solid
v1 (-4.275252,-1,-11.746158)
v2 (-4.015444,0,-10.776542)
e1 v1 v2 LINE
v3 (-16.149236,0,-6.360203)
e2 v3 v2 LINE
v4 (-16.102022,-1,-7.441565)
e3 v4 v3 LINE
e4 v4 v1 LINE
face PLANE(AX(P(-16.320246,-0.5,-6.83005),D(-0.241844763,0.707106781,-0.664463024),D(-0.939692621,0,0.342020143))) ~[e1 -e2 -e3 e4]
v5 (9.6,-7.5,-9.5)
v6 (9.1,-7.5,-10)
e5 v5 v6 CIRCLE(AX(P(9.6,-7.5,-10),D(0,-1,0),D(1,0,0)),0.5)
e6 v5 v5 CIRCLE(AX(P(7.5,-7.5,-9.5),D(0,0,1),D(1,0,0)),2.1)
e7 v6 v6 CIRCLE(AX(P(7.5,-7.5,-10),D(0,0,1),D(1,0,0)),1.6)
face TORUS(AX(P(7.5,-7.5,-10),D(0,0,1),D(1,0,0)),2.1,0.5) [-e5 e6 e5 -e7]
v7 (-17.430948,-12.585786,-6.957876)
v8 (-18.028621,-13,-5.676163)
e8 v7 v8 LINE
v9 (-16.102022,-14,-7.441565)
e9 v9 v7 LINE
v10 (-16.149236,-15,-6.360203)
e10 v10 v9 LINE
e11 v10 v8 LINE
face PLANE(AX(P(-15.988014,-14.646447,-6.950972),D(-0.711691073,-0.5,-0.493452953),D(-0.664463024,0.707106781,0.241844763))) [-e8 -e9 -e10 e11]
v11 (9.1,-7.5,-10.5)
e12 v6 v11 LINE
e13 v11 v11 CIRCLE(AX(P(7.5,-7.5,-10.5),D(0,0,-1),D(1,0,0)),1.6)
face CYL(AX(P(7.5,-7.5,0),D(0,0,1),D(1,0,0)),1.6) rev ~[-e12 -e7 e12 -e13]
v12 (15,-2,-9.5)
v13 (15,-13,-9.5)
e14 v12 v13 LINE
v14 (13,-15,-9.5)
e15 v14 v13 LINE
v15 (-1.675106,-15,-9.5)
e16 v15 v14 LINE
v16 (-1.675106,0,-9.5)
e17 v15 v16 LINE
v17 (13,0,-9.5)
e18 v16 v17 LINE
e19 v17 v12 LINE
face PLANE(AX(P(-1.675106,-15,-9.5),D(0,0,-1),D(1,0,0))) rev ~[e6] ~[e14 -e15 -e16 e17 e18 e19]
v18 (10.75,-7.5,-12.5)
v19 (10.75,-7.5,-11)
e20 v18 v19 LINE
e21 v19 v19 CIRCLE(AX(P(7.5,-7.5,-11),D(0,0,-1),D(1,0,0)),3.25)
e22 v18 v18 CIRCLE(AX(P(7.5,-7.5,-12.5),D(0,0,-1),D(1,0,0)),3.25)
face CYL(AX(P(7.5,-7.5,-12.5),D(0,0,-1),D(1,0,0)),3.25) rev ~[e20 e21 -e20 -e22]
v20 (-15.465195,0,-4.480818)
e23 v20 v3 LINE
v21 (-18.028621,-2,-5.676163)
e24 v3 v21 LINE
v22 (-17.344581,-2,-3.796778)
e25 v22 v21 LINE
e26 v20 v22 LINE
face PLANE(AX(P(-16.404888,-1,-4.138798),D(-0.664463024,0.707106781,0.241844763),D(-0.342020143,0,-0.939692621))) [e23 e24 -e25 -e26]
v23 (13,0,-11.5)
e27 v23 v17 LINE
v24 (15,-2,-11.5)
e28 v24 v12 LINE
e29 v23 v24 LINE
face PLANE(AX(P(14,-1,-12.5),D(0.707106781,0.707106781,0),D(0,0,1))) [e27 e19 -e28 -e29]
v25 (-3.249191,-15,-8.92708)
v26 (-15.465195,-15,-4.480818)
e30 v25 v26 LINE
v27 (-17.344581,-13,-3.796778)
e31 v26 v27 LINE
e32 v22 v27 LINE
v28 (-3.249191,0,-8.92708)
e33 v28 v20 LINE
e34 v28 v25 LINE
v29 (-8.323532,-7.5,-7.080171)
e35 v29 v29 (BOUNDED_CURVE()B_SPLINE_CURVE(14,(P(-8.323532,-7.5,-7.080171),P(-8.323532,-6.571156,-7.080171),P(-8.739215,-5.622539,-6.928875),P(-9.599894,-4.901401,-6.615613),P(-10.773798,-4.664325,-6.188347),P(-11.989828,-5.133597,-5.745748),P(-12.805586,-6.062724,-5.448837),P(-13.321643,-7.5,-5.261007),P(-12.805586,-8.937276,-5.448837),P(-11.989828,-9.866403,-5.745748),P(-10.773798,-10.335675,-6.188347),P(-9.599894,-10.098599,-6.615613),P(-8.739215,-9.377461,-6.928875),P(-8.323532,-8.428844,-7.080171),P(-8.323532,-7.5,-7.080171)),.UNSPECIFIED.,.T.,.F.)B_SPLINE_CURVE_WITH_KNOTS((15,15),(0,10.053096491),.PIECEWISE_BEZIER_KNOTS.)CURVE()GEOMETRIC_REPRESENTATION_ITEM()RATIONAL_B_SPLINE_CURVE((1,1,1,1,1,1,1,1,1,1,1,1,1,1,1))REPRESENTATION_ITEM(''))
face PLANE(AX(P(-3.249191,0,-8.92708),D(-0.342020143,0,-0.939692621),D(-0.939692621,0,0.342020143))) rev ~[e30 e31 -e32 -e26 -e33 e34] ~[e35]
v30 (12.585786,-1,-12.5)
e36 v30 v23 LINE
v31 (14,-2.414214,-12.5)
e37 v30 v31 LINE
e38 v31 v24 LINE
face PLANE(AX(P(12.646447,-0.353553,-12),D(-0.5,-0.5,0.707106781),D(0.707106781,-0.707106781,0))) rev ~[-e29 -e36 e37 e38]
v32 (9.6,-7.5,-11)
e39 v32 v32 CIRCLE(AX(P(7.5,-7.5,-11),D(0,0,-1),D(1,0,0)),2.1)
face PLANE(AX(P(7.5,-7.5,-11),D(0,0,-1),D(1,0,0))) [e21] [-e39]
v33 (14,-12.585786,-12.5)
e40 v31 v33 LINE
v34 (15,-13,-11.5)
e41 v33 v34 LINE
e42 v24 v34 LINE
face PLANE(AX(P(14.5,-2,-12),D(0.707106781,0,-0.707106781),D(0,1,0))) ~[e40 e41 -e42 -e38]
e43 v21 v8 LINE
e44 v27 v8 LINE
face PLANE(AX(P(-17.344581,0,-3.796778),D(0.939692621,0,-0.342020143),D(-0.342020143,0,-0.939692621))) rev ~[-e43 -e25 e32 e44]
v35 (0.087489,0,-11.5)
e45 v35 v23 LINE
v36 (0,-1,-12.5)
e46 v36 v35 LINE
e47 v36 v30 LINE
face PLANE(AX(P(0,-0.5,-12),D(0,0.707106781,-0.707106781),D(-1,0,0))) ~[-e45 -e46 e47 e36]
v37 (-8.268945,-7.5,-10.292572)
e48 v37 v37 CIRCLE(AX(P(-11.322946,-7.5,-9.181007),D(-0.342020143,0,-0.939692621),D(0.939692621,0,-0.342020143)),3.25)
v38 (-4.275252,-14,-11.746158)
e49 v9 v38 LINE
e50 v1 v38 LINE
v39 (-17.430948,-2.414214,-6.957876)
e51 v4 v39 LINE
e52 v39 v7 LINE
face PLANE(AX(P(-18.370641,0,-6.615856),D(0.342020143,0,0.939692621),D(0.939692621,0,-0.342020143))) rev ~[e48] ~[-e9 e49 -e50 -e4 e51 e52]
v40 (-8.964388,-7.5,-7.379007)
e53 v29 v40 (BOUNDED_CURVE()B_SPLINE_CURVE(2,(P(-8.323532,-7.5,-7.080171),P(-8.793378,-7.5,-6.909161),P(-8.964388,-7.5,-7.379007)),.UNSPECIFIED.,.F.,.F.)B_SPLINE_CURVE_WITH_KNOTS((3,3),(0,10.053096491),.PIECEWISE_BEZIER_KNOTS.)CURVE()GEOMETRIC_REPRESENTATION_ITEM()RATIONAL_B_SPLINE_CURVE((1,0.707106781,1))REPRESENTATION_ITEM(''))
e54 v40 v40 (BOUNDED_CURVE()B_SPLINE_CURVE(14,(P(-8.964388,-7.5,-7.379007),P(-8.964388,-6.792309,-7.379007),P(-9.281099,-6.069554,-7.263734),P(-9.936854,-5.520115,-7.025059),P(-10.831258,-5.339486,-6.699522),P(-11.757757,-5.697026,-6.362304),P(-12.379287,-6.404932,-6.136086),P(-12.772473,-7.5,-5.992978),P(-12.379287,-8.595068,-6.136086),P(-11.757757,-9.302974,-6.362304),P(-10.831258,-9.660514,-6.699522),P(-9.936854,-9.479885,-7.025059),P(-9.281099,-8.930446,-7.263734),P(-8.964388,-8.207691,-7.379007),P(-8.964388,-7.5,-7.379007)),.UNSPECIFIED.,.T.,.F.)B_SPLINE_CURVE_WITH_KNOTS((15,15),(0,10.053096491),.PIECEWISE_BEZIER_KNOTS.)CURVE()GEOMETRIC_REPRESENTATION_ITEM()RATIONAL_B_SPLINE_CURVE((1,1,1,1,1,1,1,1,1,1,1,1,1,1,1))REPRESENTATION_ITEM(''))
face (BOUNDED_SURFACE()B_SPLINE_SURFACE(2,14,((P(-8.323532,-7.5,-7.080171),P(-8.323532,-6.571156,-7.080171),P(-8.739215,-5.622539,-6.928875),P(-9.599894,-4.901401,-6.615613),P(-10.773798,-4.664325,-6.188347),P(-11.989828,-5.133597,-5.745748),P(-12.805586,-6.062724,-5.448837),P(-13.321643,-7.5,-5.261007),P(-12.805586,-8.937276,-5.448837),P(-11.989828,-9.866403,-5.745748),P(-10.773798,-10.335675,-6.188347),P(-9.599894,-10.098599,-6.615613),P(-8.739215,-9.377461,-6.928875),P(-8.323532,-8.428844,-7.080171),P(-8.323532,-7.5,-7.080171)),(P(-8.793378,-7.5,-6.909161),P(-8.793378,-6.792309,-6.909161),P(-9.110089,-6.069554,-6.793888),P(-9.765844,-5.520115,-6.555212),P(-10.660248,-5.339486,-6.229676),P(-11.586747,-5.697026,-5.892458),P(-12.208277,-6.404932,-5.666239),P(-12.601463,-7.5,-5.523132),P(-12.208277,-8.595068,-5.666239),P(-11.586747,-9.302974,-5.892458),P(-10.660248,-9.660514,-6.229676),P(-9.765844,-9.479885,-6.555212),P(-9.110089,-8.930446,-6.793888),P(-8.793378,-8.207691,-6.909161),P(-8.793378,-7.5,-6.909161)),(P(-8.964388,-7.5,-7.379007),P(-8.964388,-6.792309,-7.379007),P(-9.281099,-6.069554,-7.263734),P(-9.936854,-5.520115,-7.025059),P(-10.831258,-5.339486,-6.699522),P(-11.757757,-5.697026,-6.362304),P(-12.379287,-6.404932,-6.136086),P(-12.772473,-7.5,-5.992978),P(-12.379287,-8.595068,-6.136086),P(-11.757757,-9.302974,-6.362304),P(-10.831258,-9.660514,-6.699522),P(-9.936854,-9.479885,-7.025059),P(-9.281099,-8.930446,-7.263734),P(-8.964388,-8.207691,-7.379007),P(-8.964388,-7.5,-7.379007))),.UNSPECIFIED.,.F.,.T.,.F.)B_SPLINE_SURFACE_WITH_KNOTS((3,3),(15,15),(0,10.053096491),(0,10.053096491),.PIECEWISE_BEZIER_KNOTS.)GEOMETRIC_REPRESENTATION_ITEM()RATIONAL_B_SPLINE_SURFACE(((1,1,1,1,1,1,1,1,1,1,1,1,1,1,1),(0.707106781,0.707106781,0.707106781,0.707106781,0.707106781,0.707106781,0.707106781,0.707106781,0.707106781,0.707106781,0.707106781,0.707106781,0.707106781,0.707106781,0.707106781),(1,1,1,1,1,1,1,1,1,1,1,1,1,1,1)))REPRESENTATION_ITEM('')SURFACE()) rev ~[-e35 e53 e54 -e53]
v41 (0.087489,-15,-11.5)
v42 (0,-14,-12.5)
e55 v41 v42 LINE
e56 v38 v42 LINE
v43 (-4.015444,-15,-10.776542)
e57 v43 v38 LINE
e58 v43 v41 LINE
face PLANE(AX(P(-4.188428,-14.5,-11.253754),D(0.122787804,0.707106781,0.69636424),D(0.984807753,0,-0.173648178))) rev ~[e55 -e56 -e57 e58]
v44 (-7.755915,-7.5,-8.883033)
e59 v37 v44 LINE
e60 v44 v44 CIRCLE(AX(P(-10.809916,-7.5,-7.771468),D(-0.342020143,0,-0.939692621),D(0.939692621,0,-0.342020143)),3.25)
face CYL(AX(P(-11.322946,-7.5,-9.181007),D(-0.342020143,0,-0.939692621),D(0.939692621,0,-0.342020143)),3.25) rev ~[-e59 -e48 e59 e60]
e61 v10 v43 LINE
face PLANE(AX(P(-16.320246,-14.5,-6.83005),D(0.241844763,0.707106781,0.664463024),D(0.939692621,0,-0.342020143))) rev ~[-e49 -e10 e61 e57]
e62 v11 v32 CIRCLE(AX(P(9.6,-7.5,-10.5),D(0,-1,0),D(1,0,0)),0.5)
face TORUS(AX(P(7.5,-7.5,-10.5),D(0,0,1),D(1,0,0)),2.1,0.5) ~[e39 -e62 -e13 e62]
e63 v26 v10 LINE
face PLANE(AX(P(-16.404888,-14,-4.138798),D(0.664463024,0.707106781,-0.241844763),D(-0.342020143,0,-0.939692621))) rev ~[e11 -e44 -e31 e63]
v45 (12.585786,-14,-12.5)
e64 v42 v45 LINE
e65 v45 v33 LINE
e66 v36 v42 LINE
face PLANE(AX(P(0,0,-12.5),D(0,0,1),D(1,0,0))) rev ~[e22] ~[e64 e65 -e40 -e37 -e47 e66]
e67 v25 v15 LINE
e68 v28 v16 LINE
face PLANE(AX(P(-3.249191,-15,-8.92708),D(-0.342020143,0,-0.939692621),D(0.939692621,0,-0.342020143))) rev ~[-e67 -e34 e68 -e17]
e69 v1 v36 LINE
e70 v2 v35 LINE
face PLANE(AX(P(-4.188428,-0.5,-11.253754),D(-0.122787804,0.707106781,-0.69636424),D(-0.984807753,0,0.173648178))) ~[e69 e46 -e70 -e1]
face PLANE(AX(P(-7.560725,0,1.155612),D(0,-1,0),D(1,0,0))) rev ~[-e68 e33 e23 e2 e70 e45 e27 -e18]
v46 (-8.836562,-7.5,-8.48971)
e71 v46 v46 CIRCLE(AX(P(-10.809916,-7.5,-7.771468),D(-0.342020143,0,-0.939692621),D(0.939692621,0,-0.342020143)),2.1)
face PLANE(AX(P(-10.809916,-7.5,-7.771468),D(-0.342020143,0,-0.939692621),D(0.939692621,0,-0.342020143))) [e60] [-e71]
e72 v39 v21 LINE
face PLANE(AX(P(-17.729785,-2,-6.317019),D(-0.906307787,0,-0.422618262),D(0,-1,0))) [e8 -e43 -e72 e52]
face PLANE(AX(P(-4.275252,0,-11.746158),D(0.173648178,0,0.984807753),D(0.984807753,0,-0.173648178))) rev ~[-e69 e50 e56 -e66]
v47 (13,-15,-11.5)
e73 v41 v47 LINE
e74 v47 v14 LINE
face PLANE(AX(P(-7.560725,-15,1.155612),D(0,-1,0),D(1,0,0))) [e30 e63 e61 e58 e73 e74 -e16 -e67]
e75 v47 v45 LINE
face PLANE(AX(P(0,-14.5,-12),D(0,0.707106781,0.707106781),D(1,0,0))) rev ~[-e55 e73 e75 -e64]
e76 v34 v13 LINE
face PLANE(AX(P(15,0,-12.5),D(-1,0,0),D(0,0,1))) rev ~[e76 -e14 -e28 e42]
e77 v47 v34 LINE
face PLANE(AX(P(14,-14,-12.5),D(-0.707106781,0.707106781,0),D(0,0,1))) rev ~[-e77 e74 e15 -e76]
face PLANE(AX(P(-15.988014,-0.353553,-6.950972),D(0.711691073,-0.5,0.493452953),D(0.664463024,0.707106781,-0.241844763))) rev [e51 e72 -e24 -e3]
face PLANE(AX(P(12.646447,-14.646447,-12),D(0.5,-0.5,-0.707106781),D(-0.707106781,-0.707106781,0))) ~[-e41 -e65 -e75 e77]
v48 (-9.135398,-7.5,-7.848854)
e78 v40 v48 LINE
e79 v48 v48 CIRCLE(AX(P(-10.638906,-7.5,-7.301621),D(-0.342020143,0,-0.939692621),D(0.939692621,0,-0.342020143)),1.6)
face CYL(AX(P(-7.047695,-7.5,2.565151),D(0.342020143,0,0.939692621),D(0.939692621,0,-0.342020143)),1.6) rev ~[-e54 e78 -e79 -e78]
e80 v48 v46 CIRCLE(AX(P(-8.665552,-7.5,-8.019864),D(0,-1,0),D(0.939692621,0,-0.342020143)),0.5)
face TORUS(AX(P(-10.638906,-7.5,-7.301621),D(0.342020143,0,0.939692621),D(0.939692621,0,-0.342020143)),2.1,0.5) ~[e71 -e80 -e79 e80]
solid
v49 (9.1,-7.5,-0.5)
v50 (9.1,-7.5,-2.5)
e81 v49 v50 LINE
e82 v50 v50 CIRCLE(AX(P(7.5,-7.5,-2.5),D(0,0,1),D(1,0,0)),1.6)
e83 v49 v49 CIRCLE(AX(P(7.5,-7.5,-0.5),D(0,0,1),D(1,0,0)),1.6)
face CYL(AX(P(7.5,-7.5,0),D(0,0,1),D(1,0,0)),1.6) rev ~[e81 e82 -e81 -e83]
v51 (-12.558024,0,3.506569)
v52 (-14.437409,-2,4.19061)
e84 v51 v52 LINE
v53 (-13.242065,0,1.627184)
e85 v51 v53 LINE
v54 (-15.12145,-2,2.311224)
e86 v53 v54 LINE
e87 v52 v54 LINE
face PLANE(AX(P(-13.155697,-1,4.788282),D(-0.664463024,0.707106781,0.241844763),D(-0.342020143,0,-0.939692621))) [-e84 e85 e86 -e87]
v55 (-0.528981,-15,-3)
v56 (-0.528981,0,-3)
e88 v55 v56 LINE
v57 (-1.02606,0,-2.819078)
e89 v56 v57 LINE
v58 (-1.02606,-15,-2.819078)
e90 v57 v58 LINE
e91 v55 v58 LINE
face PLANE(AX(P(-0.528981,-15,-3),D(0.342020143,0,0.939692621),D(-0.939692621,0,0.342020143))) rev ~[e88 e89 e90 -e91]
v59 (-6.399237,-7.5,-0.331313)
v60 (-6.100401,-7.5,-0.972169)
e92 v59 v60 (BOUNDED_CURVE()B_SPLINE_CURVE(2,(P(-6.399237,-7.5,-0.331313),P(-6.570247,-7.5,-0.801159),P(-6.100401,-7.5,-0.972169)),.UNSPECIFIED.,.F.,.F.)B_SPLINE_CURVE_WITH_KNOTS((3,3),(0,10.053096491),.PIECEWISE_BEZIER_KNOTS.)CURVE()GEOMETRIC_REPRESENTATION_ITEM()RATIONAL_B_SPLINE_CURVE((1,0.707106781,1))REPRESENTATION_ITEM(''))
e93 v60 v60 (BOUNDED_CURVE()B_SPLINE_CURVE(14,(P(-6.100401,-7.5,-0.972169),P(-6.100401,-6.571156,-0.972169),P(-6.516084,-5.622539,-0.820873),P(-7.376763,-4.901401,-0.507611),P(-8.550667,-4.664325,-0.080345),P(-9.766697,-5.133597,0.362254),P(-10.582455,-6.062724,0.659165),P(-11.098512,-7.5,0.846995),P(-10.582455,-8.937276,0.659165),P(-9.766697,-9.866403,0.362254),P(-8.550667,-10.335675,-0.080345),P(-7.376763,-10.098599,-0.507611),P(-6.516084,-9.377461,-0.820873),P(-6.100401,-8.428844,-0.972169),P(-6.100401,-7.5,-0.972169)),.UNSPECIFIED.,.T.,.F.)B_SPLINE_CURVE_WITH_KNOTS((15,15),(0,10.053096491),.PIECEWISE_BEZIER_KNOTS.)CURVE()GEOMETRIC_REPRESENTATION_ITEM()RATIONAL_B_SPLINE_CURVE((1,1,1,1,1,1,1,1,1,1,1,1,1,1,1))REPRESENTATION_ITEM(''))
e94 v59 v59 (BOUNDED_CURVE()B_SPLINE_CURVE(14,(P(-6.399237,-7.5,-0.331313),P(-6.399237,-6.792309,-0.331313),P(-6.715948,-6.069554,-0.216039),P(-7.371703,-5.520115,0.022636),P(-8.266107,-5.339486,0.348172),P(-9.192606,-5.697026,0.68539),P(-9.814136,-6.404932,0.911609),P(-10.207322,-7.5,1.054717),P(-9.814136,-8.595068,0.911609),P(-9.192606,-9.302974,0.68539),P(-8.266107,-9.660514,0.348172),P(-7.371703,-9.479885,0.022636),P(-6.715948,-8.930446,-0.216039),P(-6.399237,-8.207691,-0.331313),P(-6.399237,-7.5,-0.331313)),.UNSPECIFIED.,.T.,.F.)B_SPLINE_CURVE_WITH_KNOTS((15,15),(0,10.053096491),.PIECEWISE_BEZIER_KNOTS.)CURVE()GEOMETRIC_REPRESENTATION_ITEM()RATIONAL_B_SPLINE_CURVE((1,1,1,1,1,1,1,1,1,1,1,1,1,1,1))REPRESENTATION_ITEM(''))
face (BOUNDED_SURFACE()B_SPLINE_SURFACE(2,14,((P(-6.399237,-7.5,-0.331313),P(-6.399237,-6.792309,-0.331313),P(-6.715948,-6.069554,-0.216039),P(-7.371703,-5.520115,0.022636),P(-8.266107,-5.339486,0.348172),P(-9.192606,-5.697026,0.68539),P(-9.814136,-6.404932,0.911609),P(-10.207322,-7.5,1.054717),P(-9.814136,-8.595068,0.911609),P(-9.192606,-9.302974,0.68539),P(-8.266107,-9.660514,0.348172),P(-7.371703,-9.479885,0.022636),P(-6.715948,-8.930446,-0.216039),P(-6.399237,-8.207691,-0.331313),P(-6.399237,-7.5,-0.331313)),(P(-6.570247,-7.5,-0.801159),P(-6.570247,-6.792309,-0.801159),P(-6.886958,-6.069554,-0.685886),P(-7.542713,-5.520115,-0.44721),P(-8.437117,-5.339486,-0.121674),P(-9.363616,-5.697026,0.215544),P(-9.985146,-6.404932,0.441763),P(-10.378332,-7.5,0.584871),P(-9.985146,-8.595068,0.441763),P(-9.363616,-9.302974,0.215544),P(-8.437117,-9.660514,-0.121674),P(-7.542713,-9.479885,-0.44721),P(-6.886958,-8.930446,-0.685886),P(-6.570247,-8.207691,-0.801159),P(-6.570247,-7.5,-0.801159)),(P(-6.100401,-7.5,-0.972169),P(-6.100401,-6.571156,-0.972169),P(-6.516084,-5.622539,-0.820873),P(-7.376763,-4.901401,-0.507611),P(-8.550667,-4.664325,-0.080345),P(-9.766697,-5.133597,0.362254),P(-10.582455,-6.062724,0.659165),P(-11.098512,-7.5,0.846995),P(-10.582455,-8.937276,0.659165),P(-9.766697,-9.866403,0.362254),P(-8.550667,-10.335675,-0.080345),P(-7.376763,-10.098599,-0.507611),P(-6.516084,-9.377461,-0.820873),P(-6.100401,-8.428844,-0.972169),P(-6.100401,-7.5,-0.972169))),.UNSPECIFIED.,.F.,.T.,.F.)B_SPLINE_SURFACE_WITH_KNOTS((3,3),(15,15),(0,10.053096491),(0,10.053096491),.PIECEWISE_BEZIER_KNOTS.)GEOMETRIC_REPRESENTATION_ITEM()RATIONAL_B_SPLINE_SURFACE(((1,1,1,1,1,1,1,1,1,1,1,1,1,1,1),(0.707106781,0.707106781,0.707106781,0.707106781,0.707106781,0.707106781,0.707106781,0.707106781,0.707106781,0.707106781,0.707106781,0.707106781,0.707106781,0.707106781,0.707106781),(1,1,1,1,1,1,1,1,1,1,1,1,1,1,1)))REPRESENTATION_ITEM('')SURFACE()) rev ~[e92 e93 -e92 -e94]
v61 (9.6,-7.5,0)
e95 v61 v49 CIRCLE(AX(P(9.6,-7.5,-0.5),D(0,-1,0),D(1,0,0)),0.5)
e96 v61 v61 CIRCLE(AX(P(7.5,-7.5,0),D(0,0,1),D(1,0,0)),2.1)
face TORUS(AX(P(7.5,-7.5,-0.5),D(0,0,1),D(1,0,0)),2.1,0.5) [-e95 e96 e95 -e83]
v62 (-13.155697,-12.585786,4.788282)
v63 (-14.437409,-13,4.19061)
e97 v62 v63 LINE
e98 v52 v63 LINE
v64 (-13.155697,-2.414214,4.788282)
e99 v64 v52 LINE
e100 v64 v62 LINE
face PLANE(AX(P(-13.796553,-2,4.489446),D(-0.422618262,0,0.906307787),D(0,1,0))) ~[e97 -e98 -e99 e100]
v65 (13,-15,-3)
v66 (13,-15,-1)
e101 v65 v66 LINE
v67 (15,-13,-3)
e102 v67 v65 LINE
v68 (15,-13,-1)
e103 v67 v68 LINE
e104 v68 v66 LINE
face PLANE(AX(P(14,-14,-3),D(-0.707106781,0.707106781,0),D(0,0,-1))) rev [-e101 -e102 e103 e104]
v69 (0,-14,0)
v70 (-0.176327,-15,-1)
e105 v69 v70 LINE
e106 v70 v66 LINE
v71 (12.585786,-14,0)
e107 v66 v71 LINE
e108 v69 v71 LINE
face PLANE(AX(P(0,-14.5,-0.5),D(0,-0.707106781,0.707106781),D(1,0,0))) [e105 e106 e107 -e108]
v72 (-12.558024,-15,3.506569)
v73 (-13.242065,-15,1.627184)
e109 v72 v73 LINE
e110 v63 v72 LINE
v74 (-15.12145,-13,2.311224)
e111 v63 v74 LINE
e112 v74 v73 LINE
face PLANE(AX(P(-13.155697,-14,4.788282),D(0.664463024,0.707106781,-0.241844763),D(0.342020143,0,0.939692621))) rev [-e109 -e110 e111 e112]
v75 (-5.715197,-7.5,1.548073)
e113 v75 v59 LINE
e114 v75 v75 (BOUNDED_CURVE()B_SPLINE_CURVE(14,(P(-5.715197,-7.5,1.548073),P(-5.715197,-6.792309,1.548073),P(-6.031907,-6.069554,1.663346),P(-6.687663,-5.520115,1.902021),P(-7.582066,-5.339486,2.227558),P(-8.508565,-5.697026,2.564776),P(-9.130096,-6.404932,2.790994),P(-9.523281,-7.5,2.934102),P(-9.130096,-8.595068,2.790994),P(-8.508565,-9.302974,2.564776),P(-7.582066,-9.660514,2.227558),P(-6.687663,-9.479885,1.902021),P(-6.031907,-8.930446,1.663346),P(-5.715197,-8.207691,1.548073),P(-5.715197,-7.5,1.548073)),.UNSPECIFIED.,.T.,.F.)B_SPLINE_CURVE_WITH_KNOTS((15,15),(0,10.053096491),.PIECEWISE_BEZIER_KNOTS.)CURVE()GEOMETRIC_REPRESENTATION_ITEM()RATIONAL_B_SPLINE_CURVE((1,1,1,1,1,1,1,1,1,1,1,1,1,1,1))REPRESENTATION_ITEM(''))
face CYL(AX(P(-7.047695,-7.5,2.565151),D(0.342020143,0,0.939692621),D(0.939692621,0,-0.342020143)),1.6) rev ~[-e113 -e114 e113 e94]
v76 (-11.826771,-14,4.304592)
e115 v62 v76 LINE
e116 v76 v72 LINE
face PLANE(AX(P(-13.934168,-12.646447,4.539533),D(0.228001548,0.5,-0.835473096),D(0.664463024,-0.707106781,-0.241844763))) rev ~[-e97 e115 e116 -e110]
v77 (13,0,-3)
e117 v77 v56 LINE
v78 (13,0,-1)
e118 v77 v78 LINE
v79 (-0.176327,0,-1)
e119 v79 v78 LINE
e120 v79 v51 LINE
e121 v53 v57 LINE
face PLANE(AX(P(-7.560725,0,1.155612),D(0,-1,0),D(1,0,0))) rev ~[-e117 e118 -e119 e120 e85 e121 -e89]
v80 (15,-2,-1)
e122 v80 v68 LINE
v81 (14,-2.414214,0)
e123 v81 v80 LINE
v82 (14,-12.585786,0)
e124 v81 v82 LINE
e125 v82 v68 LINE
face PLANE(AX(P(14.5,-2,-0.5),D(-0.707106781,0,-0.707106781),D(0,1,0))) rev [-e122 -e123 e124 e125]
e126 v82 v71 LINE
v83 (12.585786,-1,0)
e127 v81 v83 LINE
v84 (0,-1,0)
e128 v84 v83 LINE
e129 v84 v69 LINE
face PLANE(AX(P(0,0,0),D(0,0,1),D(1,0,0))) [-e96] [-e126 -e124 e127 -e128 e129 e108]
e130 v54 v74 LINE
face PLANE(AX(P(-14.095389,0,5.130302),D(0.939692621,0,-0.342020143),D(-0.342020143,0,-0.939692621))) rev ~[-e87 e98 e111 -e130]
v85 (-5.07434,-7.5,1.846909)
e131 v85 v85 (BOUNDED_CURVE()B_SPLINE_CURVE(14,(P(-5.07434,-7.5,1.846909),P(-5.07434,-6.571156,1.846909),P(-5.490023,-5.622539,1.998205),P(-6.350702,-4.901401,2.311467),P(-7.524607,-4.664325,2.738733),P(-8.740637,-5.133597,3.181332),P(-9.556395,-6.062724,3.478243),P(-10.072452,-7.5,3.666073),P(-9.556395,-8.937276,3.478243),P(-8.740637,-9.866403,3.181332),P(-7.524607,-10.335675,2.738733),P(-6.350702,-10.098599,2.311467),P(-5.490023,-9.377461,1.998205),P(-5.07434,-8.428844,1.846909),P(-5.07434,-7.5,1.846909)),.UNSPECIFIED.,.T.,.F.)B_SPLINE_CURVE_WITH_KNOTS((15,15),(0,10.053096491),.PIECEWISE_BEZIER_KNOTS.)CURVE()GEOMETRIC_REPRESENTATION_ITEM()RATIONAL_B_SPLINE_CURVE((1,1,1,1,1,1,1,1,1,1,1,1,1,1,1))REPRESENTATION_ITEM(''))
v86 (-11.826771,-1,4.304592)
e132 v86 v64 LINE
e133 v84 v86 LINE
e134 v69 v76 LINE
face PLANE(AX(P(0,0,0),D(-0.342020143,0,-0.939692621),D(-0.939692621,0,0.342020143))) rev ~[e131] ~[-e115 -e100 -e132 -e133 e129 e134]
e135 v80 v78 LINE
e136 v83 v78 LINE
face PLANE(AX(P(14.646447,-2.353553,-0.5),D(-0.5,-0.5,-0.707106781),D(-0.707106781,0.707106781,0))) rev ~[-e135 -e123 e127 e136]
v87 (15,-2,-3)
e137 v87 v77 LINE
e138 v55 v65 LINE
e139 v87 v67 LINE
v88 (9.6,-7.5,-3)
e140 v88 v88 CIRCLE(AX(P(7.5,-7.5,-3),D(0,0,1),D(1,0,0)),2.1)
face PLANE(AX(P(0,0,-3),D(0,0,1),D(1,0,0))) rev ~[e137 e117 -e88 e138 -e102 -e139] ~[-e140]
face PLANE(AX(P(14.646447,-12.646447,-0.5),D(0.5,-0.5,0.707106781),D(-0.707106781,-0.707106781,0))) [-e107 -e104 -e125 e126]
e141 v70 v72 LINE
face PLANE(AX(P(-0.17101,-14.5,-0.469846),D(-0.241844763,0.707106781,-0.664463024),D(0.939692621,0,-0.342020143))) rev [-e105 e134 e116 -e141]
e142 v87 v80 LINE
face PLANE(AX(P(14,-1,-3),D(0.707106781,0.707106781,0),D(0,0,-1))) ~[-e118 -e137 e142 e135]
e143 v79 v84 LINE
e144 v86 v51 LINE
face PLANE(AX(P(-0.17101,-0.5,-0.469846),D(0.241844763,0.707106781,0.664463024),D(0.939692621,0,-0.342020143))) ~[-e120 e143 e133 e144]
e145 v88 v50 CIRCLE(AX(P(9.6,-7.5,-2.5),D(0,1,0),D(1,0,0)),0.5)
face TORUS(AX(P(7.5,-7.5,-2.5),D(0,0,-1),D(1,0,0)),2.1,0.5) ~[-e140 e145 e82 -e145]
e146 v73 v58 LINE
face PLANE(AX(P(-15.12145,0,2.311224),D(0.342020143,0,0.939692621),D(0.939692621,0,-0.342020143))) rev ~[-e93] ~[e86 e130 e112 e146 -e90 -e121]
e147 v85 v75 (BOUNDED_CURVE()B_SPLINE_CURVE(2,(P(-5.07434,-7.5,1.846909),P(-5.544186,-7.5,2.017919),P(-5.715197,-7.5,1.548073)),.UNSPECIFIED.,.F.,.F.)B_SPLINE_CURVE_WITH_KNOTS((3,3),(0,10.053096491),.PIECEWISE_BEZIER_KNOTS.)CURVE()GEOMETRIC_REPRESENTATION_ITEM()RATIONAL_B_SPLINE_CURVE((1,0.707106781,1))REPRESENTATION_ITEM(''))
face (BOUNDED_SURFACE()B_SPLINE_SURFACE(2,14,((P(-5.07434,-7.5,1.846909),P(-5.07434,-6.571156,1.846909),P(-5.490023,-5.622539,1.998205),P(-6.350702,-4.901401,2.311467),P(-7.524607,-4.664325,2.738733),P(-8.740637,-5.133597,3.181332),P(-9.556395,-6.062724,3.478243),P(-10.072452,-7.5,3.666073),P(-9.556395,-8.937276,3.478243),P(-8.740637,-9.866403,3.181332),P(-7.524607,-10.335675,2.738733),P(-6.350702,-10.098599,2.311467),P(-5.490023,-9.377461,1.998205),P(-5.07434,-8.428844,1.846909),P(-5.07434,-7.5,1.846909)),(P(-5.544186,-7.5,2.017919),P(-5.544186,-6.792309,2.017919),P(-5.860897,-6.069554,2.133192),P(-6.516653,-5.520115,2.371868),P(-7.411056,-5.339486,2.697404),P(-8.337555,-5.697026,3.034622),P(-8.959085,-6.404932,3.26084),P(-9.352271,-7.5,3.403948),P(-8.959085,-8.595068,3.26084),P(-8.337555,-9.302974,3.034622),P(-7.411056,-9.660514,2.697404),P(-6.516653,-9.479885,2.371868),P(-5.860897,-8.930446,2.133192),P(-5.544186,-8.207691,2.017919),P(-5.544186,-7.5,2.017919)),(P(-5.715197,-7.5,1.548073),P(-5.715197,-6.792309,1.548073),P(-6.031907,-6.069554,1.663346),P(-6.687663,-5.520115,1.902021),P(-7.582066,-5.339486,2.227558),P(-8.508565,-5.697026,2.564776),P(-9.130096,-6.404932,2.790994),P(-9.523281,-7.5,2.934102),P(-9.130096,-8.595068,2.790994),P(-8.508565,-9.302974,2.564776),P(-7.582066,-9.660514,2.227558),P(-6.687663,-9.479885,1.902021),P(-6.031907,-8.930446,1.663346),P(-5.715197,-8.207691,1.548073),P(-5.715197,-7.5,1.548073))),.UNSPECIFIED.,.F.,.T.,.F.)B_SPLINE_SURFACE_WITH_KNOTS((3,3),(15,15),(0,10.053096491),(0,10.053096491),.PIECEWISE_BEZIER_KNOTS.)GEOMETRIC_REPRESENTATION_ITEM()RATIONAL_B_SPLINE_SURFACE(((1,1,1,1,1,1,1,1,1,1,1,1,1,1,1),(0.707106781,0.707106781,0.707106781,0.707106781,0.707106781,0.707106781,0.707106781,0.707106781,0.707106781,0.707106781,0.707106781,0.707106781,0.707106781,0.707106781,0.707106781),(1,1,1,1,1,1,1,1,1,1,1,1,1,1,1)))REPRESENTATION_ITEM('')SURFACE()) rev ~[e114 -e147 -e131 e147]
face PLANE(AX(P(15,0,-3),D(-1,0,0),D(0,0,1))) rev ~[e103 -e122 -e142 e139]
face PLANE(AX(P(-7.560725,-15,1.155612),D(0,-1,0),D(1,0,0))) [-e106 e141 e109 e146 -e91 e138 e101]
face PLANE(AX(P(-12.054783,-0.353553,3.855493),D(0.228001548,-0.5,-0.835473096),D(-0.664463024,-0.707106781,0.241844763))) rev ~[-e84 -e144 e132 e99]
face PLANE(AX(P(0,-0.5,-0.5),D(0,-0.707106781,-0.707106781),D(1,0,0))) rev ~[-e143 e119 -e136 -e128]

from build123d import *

# Parameters (mm, degrees)
F0_W           = 15
F0_H           = 3
F1_DEPTH       = 15
F2_R           = 1.6
F3_DEPTH       = 25
F4_R           = 1.6
F5_DEPTH       = 25
F7_DEPTH       = 25
F8_R           = 3.25
F8_R_2         = 1.6
F9_DEPTH       = 1.5
F10_R          = 3.25
F10_R_2        = 1.6
F11_DEPTH      = 1.5
F12_C1_SIZE    = 2
F12_C2_SIZE    = 2
F12_C3_SIZE    = 2
F12_C4_SIZE    = 2
F12_S1_C1_SIZE = 2
F12_S1_C2_SIZE = 2
F12_S1_C3_SIZE = 2
F12_S1_C4_SIZE = 2
F13_SIZE       = 1
F14_R          = 0.5
F15_SIZE       = 1


with BuildPart() as f1:
    # F0 (on Front) → F1 (new body)
    with BuildSketch(Plane.XZ):
        Polygon((-1.02606043, -2.8190778624), (0, 0), (-14.0953893118, 5.1303021499), (-15.1214497418, 2.3112242875), align=None)
        Polygon((0, -3), (0, 0), (-1.02606043, -2.8190778624), (-3.2491913616, -8.9270798975), (-4.2752517916, -11.7461577598), (0, -12.5), (0, -9.5), align=None)
        with Locations((7.5, -1.5)):
            Rectangle(F0_W, F0_H)
        Polygon((-4.2752517916, -11.7461577598), (-3.2491913616, -8.9270798975), (-17.3445806734, -3.7967777476), (-18.3706411034, -6.6158556099), align=None)
        with Locations((7.5, -11)):
            Rectangle(F0_W, F0_H)
    extrude(amount=F1_DEPTH)

    # F2 (on face) → F3 (cut)
    with BuildSketch(Plane(origin=(0, 0, 0), x_dir=(0.9396926208, 0, -0.3420201433), z_dir=(0.3420201433, 0, 0.9396926208))):
        with Locations((-7.5, -7.5)):
            Circle(F2_R)
    extrude(amount=-F3_DEPTH, mode=Mode.SUBTRACT)

    # F4 (on face) → F5 (cut)
    with BuildSketch(Plane.XY):
        with Locations((7.5, -7.5)):
            Circle(F4_R)
    extrude(amount=-F5_DEPTH, mode=Mode.SUBTRACT)

    # F6 (on face) → F7 (cut)
    with BuildSketch(Plane.XZ.offset(15)):
        Polygon((-1.6751063167, -9.5), (-0.5289809421, -3), (-1.02606043, -2.8190778624), (-3.2491913616, -8.9270798975), align=None)
        Polygon((0, -3), (-0.5289809421, -3), (-1.6751063167, -9.5), (0, -9.5), align=None)
    extrude(amount=-F7_DEPTH, mode=Mode.SUBTRACT)

    # F8 (on face) → F9 (cut)
    with BuildSketch(Plane(origin=(-4.2752517916, 0, -11.7461577598), x_dir=(0.9396926208, 0, -0.3420201433), z_dir=(-0.3420201433, 0, -0.9396926208))):
        with Locations((-7.5, 7.5)):
            Circle(F8_R)
        with Locations((-7.5, 7.5)):
            Circle(F8_R_2, mode=Mode.SUBTRACT)
    extrude(amount=-F9_DEPTH, mode=Mode.SUBTRACT)

    # F10 (on face) → F11 (cut)
    with BuildSketch(Plane(origin=(0, 0, -12.5), x_dir=(1, 0, 0), z_dir=(0, 0, -1))):
        with Locations((7.5, 7.5)):
            Circle(F10_R)
        with Locations((7.5, 7.5)):
            Circle(F10_R_2, mode=Mode.SUBTRACT)
    extrude(amount=-F11_DEPTH, mode=Mode.SUBTRACT)

    # F12: chamfer of 2 on 4 edges, made by hand

    # F12_c1
    f12_c1_edges = [f1.edges().sort_by_distance(p)[0] for p in [
        (15, 0, -1.5),
    ]]
    chamfer(f12_c1_edges, length=F12_C1_SIZE)

    # F12_c2
    f12_c2_edges = [f1.edges().sort_by_distance(p)[0] for p in [
        (15, -15, -1.5),
    ]]
    chamfer(f12_c2_edges, length=F12_C2_SIZE)

    # F12_c3
    f12_c3_edges = [f1.edges().sort_by_distance(p)[0] for p in [
        (-14.6084195268, 0, 3.7207632187),
    ]]
    chamfer(f12_c3_edges, length=F12_C3_SIZE)

    # F12_c4
    f12_c4_edges = [f1.edges().sort_by_distance(p)[0] for p in [
        (-14.6084195268, -15, 3.7207632187),
    ]]
    chamfer(f12_c4_edges, length=F12_C4_SIZE)

    # F12#s1: chamfer of 2 on 4 edges, made by hand

    # F12_s1_c1
    f12_s1_c1_edges = [f1.edges().sort_by_distance(p)[0] for p in [
        (-17.8576108884, 0, -5.2063166788),
    ]]
    chamfer(f12_s1_c1_edges, length=F12_S1_C1_SIZE)

    # F12_s1_c2
    f12_s1_c2_edges = [f1.edges().sort_by_distance(p)[0] for p in [
        (15, 0, -11),
    ]]
    chamfer(f12_s1_c2_edges, length=F12_S1_C2_SIZE)

    # F12_s1_c3
    f12_s1_c3_edges = [f1.edges().sort_by_distance(p)[0] for p in [
        (-17.8576108884, -15, -5.2063166788),
    ]]
    chamfer(f12_s1_c3_edges, length=F12_S1_C3_SIZE)

    # F12_s1_c4
    f12_s1_c4_edges = [f1.edges().sort_by_distance(p)[0] for p in [
        (15, -15, -11),
    ]]
    chamfer(f12_s1_c4_edges, length=F12_S1_C4_SIZE)

    # F13
    f13_edges = [f1.edges().sort_by_distance(p)[0] for p in [
        (-18.370641, -7.5, -6.615856),
        (-17.430948, -14, -6.957876),
        (-10.383254, -15, -9.523027),
        (-17.430948, -1, -6.957876),
        (-10.383254, 0, -9.523027),
        (-2.137626, 0, -12.123079),
        (-2.137626, -15, -12.123079),
        (6.5, -15, -12.5),
        (6.5, 0, -12.5),
        (14, -1, -12.5),
        (15, -7.5, -12.5),
        (14, -14, -12.5),
    ]]
    chamfer(f13_edges, length=F13_SIZE)

    # F14
    f14_edges = [f1.edges().sort_by_distance(p)[0] for p in [
        (-12.313424, -7.5, -7.224236),
        (5.9, -7.5, -11),
        (5.9, -7.5, -9.5),
        (-11.800394, -7.5, -5.814697),
        (-8.551203, -7.5, 3.112383),
        (5.9, -7.5, 0),
        (-9.577263, -7.5, 0.293305),
        (5.9, -7.5, -3),
    ]]
    fillet(f14_edges, radius=F14_R)

    # F15
    f15_edges = [f1.edges().sort_by_distance(p)[0] for p in [
        (-6.108002, -15, 2.223131),
        (6.5, -15, 0),
        (14, -14, 0),
        (15, -7.5, 0),
        (14, -1, 0),
        (6.5, 0, 0),
        (-6.108002, 0, 2.223131),
        (-13.155697, -14, 4.788282),
        (-14.095389, -7.5, 5.130302),
        (-13.155697, -1, 4.788282),
    ]]
    chamfer(f15_edges, length=F15_SIZE)


solid = f1.part
